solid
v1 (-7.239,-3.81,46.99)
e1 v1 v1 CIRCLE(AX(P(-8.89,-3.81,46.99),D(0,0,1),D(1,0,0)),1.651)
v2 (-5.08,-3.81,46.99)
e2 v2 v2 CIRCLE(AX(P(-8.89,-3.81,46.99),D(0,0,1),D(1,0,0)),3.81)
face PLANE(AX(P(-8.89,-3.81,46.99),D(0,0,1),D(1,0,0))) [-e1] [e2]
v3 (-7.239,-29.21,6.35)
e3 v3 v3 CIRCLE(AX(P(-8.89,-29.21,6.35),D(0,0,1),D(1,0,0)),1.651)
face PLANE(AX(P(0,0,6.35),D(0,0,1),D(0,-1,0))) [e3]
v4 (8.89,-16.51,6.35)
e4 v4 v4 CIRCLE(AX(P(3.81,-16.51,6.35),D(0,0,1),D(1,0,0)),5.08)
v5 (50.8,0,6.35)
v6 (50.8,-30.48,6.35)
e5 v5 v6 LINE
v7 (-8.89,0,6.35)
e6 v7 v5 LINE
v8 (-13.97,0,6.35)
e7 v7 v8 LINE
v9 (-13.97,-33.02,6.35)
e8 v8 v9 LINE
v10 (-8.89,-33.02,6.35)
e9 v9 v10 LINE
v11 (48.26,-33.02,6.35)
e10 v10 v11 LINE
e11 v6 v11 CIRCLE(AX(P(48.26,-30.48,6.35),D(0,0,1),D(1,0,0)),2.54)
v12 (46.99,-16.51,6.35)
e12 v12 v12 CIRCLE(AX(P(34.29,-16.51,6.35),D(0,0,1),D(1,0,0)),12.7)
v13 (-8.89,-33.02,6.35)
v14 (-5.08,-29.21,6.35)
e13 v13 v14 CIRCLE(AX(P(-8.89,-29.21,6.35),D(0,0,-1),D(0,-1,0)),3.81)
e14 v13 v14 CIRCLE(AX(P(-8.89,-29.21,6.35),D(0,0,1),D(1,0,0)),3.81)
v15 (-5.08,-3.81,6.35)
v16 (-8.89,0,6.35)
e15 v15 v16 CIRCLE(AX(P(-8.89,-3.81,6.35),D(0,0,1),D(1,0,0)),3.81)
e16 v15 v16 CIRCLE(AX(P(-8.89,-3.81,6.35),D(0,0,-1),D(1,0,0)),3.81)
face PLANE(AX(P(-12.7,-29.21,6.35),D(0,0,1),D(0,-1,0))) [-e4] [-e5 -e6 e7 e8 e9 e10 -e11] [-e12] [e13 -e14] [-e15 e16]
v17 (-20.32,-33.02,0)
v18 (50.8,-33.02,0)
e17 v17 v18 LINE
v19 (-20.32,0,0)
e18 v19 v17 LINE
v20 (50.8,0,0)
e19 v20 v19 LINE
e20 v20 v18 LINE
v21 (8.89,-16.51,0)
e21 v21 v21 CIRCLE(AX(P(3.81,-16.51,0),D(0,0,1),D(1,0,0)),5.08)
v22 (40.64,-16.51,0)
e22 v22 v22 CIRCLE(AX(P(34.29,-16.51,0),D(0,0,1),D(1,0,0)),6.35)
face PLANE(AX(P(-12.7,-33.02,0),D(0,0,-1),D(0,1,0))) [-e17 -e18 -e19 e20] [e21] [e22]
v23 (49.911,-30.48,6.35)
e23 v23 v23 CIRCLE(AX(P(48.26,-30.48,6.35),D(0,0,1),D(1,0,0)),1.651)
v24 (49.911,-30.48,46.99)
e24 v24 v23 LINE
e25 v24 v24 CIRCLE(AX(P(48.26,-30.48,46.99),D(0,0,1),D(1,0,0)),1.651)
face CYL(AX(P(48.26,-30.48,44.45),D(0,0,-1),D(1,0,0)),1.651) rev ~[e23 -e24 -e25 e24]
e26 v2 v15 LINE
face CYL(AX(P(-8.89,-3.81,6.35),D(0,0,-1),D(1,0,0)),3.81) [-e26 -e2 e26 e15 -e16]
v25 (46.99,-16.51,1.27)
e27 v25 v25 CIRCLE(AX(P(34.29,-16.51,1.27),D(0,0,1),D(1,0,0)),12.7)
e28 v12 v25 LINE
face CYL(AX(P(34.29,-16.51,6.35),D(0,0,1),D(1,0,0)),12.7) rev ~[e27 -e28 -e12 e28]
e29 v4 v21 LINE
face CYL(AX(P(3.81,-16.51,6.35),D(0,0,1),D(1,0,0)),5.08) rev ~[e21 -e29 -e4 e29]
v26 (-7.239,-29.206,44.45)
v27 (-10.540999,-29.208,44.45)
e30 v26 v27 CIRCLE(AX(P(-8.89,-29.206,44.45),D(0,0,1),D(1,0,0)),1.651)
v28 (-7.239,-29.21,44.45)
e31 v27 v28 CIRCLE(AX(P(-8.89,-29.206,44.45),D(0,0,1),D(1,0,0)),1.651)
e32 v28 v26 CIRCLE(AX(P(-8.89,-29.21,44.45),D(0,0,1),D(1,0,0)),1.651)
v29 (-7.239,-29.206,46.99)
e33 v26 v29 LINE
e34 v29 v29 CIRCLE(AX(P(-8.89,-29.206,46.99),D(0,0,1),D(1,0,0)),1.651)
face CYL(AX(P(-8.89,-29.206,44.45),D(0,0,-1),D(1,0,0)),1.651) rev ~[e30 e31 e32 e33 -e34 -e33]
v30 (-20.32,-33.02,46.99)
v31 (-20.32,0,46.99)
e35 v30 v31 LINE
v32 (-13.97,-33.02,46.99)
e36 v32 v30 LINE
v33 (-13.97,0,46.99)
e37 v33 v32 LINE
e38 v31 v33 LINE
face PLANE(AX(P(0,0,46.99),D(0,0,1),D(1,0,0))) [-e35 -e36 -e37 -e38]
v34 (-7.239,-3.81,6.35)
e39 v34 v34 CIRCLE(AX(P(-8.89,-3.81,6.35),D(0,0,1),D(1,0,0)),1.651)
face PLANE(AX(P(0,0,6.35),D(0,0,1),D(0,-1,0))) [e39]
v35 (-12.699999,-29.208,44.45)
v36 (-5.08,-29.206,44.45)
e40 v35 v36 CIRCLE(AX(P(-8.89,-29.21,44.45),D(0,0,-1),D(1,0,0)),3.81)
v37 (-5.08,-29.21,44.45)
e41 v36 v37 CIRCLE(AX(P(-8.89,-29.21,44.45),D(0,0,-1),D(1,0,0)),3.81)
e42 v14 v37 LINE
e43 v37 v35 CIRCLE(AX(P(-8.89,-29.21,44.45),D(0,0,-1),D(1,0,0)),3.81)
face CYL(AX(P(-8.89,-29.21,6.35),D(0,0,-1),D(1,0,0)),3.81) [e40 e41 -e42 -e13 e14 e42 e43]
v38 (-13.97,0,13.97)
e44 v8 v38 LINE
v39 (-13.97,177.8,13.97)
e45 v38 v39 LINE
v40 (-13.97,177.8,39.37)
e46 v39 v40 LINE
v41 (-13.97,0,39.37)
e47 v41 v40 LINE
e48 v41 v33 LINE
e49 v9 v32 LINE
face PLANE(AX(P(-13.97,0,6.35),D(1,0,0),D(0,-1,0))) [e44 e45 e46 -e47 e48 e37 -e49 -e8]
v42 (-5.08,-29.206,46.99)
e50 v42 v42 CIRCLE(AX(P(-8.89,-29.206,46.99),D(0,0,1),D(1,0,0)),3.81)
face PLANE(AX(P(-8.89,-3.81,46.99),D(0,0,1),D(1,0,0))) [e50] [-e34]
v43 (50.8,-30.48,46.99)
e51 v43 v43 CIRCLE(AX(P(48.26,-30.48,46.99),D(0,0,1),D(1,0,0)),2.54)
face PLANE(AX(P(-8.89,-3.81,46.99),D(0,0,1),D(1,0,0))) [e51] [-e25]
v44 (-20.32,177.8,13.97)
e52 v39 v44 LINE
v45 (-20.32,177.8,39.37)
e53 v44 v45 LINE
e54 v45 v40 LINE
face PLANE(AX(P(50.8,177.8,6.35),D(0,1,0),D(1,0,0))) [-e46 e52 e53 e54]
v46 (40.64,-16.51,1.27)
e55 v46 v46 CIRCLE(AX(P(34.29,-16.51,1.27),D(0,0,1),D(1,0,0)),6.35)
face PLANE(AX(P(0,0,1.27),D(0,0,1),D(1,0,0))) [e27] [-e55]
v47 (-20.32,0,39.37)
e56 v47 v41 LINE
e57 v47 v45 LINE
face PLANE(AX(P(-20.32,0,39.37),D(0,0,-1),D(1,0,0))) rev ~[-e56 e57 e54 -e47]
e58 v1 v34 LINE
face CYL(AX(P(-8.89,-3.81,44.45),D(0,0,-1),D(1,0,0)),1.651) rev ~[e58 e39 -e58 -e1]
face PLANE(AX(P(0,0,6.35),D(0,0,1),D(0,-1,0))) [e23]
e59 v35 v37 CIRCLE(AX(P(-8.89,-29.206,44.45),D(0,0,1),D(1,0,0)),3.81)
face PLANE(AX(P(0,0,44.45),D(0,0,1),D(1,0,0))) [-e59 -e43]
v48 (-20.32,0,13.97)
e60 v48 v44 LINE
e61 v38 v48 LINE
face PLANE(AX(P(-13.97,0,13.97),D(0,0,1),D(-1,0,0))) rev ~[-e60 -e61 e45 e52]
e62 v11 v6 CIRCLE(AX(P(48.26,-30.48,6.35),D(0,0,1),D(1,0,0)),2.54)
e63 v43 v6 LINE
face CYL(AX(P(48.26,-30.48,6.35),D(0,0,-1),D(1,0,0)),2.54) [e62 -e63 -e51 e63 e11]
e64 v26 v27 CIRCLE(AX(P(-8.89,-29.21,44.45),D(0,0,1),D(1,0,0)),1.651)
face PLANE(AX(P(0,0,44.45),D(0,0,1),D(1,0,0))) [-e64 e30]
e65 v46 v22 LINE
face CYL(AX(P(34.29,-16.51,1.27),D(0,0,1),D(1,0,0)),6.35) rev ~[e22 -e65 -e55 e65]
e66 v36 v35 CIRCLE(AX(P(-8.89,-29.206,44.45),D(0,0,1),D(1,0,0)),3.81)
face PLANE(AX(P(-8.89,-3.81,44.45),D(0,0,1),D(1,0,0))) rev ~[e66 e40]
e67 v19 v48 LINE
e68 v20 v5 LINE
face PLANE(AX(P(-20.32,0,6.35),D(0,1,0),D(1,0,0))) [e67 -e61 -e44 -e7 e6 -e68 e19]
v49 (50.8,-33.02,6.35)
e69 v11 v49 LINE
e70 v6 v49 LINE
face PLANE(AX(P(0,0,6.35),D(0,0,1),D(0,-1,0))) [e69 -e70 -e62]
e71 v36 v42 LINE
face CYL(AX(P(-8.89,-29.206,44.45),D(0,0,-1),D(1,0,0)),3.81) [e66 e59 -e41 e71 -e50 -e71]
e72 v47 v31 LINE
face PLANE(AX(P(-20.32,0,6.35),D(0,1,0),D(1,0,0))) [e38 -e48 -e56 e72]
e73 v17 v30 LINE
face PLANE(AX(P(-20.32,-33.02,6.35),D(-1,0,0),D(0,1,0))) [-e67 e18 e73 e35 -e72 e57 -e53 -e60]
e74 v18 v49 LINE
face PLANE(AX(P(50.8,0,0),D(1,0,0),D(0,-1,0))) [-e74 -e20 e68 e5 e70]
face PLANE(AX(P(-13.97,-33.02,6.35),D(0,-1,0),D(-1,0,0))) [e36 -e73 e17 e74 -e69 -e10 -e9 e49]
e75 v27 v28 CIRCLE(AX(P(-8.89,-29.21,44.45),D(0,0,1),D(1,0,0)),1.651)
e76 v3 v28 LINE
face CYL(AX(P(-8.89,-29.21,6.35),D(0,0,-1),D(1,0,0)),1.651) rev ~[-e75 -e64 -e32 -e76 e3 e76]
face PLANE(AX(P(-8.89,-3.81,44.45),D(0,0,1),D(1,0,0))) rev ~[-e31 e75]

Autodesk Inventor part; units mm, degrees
ref_plane "YZ Plane" through (0, 0, 0) normal (1, 0, 0) x (0, 1, 0)
ref_plane "XZ Plane" through (0, 0, 0) normal (0, 1, 0) x (-1, 0, 0)
ref_plane "XY Plane" through (0, 0, 0) normal (0, 0, 1) x (1, 0, 0)
sketch "Sketch1" plane through (0, 0, 0) normal (0, 0, 1) x (1, 0, 0)
  line L0 (0, 0) -> (50.8, 0)
  line L1 (50.8, 0) -> (50.8, -33.02)
  line L2 (50.8, -33.02) -> (0, -33.02)
  line L3 (0, -33.02) -> (0, 0)
  dimension "d0" = 50.8
  dimension "d1" = 33.02
extrude "Extrusion1" add sketch "Sketch1" along normal blind 6.35
sketch "Sketch2" plane through (0, 0, 6.35) normal (0, 0, 1) x (1, 0, 0)
  line L0 (50.8, 0) -> (0, 0) projected
  line L1 (0, 0) -> (0, -33.02) projected
  circle A0 centre (34.29, -16.51) radius 12.7
  point P0 (7.62, -16.51)
  dimension "d4" = 16.51
  dimension "d5" = 16.51
  dimension "d6" = 26.67
  dimension "d7" = 7.62
  dimension "d8" = 25.4
extrude "Extrusion2" cut sketch "Sketch2" against normal blind 5.08
sketch "Sketch3" plane through (34.29, -16.51, 1.27) normal (0, 0, 1) x (1, 0, 0)
  circle A0 centre (0, 0) radius 6.35
  point P0 (-34.29, 16.51)
  dimension "d11" = 12.7
extrude "Extrusion3" cut sketch "Sketch3" against normal blind 5.08
sketch "Sketch14" plane through (0, -33.02, 0) normal (-1, 0, 0) x (0, 0, 1)
  line L0 (0, 33.02) -> (6.35, 33.02)
  line L1 (6.35, 33.02) -> (6.35, 0)
  line L2 (6.35, 0) -> (0, 0)
  line L3 (0, 0) -> (0, 33.02)
extrude "Extrusion14" add sketch "Sketch14" along normal blind 12.7
sketch "Sketch15" plane through (0, 0, 6.35) normal (0, 0, 1) x (1, 0, 0)
  line L0 (-12.7, -33.02) -> (-12.7, 0) projected
  line L1 (50.8, -33.02) -> (-12.7, -33.02) projected
  line L2 (50.8, 0) -> (-12.7, 0) projected
  circle A0 centre (-8.89, -3.81) radius 3.81
  circle A1 centre (-8.89, -29.21) radius 3.81
  circle A2 centre (-8.89, -29.21) radius 1.651
  circle A3 centre (-8.89, -3.81) radius 1.651
  point P0 (0, 0)
  dimension "d58" = 3.81
  dimension "d59" = 3.81
  dimension "d60" = 3.81
  dimension "d61" = 3.81
  dimension "d62" = 7.62
  dimension "d63" = 7.62
  dimension "d64" = 3.302
  dimension "d65" = 3.302
extrude "Extrusion15" add sketch "Sketch15" along normal blind 38.1 contours A1 | A0
sketch "Sketch16" plane through (0, 0, 6.35) normal (0, 0, 1) x (1, 0, 0)
  circle A0 centre (48.26, -30.48) radius 2.54
  line L0 (50.8, -33.02) -> (-8.89, -33.02) projected
  line L1 (50.8, -33.02) -> (50.8, 0) projected
  circle A1 centre (48.26, -30.48) radius 1.651
  point P0 (0, 0)
  dimension "d68" = 5.08
  dimension "d69" = 2.54
  dimension "d70" = 2.54
  dimension "d71" = 3.302
extrude "Extrusion16" add sketch "Sketch16" along normal blind 38.1 contours A0
sketch "Sketch17" plane through (-8.89, -3.81, 44.45) normal (0, 0, 1) x (1, 0, 0)
  circle A0 centre (0, 0) radius 1.651 projected
  circle A1 centre (0, 0) radius 1.651
  circle A2 centre (0, 0) radius 3.81
  circle A3 centre (0, -25.396) radius 1.651
  circle A4 centre (0, -25.396) radius 3.81
  circle A5 centre (57.15, -26.67) radius 1.651 projected
  circle A6 centre (57.15, -26.67) radius 1.651
  circle A7 centre (57.15, -26.67) radius 2.54
  point P0 (8.89, 3.81)
  dimension "d74" = 3.302
  dimension "d75" = 7.62
  dimension "d76" = 3.302
  dimension "d77" = 7.62
  dimension "d78" = 5.08
extrude "Extrusion17" add sketch "Sketch17" along normal blind 2.54
sketch "Sketch18" plane through (-12.7, -33.02, 0) normal (-1, 0, 0) x (0, 0, 1)
  line L0 (6.35, 3.81) -> (6.35, 0) projected
  line L1 (0, 33.02) -> (6.35, 33.02)
  line L2 (6.35, 33.02) -> (6.35, 0)
  line L3 (6.35, 0) -> (0, 0)
  line L4 (0, 0) -> (0, 33.02)
extrude "Extrusion18" add sketch "Sketch18" along normal blind 12.7
sketch "Sketch20" plane through (-25.4, -33.02, 0) normal (-1, 0, 0) x (0, 0, 1)
  line L0 (0, 33.02) -> (0, 0) projected
  line L1 (0, 0) -> (6.35, 0) projected
  line L2 (0, 33.02) -> (6.35, 33.02)
  line L3 (6.35, 33.02) -> (6.35, 0)
  line L4 (6.35, 0) -> (0, 0)
  line L5 (0, 0) -> (0, 33.02)
extrude "Extrusion20" cut sketch "Sketch20" against normal blind 5.08
sketch "Sketch21" plane through (0, 0, 6.35) normal (0, 0, 1) x (1, 0, 0)
  line L0 (-20.32, 0) -> (50.8, 0) projected
  line L1 (-20.32, 0) -> (-13.97, 0)
  line L2 (-13.97, 0) -> (-13.97, -33.02)
  line L3 (-13.97, -33.02) -> (-20.32, -33.02)
  line L4 (-20.32, -33.02) -> (-20.32, 0)
  point P0 (0, 0)
  dimension "d88" = 6.35
  dimension "d89" = 33.02
extrude "Extrusion21" add sketch "Sketch21" along normal blind 40.64
sketch "Sketch23" plane through (50.8, 0, 6.35) normal (0, 1, 0) x (1, 0, 0)
  line L0 (-64.77, 0) -> (-64.77, -40.64) projected
  line L1 (-64.77, -7.62) -> (-71.12, -7.62)
  line L2 (-71.12, -7.62) -> (-71.12, -33.02)
  line L3 (-71.12, -33.02) -> (-64.77, -33.02)
  line L4 (-64.77, -33.02) -> (-64.77, -7.62)
  line L5 (-64.77, -40.64) -> (-71.12, -40.64) projected
  point P0 (-50.8, 6.35)
  dimension "d94" = 25.4
  dimension "d95" = 6.35
  dimension "d96" = 7.62
extrude "Extrusion23" add sketch "Sketch23" along normal blind 177.8
sketch "Sketch24" plane through (0, 0, 6.35) normal (0, 0, 1) x (1, 0, 0)
  circle A0 centre (3.81, -16.51) radius 5.08
  circle A1 centre (34.29, -16.51) radius 6.35 projected
  line L0 (48.26, -33.02) -> (-8.89, -33.02) projected
  point P0 (0, 0)
  dimension "d99" = 10.16
  dimension "d100" = 30.48
  dimension "d101" = 16.51
extrude "Extrusion24" cut sketch "Sketch24" against normal blind 25.4 contours A0
properties part number "servo attachment claw"
